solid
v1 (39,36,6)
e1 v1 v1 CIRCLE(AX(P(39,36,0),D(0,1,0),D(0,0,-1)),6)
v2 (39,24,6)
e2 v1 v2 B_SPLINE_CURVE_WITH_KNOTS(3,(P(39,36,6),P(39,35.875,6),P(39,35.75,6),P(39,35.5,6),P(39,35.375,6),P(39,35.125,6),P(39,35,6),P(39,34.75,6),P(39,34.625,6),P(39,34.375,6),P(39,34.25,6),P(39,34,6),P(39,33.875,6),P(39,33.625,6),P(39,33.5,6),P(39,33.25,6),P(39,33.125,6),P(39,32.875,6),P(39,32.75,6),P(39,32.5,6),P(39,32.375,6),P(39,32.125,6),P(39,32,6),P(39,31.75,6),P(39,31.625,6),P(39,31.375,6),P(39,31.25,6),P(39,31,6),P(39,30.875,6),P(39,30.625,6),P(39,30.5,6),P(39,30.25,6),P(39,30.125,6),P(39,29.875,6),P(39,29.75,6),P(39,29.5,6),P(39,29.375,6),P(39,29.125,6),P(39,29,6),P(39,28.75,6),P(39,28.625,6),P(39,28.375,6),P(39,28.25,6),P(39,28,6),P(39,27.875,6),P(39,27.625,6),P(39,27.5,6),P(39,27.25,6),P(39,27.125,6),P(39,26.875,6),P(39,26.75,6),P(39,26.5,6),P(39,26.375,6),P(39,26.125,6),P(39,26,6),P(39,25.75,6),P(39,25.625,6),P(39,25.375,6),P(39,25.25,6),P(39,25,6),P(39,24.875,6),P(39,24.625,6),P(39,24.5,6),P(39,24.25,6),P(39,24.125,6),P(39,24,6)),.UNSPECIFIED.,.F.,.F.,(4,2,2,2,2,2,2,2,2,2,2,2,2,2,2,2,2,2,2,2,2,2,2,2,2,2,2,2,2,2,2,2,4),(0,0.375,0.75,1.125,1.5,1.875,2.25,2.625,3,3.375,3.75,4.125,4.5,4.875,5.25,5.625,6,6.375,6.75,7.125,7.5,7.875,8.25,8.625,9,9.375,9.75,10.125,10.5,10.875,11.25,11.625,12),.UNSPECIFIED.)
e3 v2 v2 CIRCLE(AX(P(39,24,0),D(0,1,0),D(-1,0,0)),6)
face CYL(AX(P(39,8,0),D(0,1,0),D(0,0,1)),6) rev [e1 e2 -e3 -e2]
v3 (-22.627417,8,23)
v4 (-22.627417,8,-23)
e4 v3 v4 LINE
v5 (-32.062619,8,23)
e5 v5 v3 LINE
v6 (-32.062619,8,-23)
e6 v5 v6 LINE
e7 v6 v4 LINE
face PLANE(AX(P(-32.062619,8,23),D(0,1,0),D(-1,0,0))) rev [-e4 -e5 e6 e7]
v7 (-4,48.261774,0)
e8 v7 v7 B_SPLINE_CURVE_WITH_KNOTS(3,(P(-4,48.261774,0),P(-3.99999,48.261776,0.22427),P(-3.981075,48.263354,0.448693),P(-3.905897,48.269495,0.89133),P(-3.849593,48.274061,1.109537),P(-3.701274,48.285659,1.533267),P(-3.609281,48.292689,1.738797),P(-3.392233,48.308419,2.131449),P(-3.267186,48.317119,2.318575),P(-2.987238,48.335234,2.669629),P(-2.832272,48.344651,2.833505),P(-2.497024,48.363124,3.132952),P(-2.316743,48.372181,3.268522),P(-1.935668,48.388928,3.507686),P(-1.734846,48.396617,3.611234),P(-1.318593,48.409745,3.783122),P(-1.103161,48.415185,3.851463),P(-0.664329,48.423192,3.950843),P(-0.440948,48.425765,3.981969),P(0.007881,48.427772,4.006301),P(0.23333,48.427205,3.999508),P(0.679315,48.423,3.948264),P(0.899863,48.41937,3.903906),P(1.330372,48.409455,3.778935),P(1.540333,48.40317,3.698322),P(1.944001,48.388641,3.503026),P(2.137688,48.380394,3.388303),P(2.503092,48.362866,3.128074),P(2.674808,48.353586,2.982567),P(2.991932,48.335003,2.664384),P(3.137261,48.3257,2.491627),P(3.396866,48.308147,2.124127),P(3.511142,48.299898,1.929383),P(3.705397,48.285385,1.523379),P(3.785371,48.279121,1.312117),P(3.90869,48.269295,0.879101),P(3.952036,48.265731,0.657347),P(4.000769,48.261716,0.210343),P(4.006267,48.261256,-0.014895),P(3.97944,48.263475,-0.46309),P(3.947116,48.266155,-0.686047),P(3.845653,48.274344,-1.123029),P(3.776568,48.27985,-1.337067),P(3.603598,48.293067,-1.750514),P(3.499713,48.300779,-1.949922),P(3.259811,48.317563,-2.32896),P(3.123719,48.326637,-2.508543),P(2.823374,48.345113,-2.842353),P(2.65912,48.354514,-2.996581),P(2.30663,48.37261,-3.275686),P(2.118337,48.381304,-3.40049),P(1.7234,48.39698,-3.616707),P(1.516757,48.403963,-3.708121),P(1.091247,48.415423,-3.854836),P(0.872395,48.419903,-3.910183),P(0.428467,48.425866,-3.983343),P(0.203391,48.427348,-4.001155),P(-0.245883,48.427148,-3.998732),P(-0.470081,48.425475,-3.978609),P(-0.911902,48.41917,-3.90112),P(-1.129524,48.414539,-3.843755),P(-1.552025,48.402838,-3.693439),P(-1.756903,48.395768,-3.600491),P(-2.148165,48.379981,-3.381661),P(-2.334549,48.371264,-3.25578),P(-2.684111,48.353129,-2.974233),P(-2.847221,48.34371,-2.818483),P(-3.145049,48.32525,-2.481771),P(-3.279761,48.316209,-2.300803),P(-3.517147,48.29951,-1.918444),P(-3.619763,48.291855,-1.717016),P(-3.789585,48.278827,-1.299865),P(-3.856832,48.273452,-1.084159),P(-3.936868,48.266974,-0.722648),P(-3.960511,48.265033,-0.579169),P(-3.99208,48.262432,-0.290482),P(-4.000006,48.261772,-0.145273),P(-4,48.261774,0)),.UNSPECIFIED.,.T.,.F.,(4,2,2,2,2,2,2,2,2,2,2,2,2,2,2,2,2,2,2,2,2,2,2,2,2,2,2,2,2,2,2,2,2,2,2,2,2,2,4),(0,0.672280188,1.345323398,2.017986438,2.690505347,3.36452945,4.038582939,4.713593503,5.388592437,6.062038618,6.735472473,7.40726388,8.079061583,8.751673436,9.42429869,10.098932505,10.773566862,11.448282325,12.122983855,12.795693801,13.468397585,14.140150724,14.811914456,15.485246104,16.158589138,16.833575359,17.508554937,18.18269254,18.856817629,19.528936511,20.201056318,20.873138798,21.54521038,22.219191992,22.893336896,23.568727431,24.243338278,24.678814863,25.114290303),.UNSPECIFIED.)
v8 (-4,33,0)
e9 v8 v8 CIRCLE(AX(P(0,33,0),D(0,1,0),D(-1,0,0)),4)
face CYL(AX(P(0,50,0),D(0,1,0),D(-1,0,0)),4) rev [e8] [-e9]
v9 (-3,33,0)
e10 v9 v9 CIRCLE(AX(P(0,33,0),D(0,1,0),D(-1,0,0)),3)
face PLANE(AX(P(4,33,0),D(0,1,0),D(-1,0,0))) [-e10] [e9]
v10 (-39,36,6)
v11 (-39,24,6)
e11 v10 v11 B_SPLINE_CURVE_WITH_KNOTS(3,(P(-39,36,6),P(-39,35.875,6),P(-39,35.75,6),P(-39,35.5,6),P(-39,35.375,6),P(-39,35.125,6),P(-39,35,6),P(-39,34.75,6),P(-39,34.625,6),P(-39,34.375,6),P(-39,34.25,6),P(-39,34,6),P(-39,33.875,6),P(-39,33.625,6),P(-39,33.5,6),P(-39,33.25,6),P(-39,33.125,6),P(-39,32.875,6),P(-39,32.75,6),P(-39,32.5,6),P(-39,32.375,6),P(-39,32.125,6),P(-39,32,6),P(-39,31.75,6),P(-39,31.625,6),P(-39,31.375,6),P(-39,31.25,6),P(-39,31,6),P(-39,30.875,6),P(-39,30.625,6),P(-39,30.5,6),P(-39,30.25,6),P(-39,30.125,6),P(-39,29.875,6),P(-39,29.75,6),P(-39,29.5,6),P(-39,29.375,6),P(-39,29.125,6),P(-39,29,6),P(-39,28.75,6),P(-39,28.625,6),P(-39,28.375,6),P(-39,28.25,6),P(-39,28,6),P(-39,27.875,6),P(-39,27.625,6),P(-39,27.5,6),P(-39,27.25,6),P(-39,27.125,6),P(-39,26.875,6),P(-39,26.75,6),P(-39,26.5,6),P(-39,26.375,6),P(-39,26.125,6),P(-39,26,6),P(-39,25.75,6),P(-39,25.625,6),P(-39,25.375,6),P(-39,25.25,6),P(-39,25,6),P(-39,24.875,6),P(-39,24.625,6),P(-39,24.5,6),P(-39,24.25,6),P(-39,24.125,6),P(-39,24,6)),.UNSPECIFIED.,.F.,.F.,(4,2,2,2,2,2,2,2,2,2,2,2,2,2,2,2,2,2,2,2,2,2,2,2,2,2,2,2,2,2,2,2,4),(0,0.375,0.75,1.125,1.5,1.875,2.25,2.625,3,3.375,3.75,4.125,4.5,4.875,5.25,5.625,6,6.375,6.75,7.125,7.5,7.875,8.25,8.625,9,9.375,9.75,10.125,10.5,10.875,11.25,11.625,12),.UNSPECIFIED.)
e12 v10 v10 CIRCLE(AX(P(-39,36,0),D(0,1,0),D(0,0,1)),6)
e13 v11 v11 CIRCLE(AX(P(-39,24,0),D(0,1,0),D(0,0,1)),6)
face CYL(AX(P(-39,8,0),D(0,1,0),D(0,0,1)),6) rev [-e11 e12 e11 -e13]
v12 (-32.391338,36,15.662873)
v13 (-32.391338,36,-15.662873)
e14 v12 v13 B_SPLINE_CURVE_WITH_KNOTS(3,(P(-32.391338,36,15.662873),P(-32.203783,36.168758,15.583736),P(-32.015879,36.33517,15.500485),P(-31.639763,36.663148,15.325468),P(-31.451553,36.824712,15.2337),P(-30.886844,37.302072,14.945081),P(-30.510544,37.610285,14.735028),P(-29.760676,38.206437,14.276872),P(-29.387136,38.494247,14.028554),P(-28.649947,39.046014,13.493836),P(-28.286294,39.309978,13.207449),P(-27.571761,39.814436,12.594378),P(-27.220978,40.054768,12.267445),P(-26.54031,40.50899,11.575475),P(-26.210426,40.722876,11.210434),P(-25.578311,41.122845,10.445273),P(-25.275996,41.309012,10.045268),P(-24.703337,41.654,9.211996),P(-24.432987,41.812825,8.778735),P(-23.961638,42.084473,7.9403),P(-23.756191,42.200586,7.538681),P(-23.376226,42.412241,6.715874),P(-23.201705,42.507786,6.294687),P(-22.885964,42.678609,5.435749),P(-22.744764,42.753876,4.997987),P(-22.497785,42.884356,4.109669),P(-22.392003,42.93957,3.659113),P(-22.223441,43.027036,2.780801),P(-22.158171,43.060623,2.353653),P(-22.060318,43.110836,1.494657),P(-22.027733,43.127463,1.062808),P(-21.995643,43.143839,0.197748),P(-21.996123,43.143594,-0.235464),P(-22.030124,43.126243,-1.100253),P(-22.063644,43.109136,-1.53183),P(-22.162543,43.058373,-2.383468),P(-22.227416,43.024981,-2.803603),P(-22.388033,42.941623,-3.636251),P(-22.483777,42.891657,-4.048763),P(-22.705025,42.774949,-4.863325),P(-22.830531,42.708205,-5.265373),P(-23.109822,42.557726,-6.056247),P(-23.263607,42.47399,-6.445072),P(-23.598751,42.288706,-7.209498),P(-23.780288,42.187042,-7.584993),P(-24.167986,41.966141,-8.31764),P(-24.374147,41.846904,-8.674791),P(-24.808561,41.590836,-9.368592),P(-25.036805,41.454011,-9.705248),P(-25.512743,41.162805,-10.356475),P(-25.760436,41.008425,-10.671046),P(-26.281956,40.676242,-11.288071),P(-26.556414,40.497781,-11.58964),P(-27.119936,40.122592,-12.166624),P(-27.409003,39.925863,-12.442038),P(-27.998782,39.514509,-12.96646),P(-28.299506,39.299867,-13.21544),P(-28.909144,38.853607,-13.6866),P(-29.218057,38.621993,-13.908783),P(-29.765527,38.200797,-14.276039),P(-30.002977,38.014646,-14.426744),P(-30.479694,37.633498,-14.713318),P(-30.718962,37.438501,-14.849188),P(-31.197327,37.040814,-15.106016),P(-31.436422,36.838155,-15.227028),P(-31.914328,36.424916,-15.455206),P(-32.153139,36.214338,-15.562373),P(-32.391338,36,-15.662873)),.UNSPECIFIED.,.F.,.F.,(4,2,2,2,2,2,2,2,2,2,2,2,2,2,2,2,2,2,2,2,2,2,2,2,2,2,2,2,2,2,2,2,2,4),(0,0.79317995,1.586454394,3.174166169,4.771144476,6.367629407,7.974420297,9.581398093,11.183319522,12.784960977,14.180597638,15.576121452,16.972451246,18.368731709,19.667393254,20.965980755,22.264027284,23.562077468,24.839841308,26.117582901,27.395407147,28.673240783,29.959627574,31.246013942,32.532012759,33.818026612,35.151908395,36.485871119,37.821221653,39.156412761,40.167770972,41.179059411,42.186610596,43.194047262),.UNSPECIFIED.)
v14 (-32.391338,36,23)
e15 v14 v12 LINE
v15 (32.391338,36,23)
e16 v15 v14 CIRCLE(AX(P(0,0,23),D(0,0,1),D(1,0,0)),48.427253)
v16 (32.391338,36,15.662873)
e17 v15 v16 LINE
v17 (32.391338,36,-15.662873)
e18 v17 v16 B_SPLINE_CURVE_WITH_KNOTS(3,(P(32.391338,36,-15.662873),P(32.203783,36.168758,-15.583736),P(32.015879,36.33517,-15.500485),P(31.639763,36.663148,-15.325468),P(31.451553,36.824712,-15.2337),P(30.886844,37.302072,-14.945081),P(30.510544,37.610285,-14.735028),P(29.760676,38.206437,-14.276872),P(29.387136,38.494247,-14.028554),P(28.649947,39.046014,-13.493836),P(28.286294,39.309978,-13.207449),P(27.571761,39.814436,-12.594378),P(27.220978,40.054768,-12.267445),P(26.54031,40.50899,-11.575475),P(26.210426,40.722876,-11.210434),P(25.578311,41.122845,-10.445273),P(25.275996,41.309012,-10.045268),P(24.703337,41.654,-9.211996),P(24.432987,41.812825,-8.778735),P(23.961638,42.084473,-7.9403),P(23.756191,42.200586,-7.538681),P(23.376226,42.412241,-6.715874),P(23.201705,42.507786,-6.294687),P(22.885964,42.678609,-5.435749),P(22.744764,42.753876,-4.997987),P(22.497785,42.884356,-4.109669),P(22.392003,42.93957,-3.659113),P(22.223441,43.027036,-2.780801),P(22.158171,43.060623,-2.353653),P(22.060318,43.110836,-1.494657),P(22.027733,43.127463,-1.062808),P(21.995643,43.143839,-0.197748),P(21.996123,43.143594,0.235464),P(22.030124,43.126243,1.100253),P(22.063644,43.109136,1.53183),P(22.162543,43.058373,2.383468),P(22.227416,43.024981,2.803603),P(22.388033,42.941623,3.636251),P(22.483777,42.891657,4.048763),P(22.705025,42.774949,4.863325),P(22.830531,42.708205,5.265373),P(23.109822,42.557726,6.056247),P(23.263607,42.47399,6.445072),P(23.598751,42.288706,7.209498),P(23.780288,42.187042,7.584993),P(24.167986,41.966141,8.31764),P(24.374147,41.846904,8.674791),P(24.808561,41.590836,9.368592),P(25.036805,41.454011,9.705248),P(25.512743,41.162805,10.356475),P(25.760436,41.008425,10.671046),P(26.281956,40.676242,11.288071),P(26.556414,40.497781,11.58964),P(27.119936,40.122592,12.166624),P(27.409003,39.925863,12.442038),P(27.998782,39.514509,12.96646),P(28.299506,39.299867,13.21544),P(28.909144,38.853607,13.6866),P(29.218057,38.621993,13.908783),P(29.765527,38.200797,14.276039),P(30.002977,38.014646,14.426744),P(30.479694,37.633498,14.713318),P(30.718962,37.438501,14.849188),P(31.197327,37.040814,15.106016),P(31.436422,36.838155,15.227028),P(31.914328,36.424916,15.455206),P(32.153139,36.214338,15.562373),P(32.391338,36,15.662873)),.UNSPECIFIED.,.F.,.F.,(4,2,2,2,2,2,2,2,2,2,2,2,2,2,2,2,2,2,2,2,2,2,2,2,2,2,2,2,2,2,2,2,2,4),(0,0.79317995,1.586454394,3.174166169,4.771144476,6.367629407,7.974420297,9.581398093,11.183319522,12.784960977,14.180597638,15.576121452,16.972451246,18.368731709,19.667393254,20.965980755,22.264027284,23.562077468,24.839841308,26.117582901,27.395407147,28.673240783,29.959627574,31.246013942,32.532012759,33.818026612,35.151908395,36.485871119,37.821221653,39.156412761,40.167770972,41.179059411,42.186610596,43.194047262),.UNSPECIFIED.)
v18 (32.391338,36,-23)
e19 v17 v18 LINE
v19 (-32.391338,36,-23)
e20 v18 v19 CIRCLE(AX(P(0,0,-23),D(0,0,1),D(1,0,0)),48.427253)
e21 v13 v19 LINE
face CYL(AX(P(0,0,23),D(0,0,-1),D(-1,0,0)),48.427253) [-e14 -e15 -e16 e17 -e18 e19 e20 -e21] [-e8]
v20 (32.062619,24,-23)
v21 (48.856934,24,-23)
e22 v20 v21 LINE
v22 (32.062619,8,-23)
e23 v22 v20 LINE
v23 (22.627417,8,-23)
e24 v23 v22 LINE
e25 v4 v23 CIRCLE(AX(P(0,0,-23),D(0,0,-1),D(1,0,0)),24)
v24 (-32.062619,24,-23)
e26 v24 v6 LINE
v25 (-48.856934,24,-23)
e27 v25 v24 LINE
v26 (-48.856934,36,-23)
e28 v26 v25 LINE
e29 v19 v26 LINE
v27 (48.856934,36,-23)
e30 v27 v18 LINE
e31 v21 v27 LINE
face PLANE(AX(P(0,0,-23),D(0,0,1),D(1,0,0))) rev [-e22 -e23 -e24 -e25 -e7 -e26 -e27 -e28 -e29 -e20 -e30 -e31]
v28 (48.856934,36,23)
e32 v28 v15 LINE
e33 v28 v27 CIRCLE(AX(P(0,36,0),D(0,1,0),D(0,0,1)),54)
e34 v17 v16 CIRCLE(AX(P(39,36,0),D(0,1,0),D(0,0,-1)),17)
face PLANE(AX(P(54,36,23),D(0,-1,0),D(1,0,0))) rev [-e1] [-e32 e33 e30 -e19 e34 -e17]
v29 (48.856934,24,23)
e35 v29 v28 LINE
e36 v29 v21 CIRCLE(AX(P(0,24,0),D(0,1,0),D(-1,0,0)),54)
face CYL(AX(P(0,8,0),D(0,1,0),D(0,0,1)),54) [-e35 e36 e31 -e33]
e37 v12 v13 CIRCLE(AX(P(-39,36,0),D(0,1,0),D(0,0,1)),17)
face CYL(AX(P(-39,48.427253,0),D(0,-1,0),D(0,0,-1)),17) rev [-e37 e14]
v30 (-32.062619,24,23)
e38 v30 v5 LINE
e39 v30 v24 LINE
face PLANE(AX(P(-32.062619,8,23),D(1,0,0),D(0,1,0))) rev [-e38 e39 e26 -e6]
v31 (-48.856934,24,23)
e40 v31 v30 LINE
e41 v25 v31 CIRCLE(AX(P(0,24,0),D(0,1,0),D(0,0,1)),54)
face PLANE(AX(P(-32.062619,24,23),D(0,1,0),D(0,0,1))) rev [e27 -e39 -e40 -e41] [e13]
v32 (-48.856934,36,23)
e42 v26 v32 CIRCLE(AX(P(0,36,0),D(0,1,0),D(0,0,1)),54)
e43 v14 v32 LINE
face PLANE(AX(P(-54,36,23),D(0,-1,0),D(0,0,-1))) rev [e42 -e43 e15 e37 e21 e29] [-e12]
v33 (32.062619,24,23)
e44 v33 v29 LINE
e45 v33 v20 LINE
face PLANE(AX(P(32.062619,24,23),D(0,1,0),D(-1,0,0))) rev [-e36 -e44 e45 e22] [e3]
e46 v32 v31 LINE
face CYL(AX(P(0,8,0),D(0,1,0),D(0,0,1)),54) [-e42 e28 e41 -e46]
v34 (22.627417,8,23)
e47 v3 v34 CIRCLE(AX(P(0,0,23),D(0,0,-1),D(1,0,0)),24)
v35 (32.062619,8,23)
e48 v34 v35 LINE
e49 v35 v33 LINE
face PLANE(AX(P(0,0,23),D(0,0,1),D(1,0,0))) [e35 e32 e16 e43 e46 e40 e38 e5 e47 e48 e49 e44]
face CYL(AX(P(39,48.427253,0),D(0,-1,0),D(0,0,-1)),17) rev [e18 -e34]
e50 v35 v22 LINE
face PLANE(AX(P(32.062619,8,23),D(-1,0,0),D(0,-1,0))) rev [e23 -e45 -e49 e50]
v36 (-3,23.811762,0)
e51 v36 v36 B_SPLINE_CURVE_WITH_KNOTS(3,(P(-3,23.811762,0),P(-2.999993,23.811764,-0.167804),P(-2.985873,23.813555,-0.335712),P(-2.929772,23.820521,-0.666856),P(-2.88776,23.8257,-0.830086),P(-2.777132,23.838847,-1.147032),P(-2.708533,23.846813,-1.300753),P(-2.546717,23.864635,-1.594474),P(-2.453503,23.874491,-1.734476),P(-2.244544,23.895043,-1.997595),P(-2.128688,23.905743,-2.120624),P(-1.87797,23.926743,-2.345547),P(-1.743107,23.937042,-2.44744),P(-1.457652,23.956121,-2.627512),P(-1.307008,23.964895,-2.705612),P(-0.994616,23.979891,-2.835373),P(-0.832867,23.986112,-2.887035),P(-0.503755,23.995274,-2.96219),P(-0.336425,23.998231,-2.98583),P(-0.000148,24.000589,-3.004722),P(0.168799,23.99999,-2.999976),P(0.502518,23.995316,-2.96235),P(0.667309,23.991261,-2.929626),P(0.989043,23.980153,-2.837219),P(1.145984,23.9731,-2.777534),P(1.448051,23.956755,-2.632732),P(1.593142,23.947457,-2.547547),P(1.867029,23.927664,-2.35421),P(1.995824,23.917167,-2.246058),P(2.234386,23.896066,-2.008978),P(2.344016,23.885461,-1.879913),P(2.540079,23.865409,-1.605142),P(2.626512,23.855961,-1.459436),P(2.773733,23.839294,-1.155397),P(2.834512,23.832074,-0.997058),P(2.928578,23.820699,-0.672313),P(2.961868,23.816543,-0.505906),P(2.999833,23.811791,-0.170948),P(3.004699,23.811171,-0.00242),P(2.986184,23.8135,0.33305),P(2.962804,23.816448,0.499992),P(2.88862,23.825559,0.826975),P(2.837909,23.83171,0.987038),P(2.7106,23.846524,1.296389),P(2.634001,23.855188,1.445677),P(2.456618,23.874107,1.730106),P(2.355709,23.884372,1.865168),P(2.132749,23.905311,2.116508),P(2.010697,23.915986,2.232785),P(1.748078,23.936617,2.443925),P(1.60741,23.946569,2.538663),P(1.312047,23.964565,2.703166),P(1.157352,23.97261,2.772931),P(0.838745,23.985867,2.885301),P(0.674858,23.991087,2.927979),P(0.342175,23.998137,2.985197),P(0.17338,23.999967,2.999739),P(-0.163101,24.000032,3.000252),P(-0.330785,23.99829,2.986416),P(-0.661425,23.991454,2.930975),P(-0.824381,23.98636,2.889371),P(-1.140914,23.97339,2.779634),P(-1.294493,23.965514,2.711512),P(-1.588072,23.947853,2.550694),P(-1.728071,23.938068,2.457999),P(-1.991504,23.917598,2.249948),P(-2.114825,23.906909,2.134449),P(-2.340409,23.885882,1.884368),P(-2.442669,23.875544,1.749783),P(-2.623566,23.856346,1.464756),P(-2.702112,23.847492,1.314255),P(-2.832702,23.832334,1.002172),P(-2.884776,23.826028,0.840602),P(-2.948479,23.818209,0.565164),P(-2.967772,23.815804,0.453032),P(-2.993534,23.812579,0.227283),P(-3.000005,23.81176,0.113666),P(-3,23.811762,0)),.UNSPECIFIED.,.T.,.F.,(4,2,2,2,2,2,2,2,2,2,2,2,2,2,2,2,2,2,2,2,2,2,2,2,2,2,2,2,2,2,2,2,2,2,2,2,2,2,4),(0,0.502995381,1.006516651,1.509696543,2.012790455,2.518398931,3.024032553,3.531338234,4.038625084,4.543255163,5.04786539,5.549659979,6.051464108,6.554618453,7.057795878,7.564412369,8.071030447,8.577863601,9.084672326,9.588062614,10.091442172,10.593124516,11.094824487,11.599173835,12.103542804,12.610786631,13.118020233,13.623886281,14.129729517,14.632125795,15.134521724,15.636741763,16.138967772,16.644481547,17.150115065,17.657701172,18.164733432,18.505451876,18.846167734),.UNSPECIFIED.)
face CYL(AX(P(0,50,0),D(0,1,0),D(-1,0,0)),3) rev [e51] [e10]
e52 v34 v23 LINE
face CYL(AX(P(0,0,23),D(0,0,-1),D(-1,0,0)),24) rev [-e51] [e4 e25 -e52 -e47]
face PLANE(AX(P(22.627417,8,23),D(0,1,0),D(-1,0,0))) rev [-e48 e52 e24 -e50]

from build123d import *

# Parameters (mm, degrees)
BOSS_EXTRUDE1_DEPTH = 23
SKETCH2_R           = 17
CUT_EXTRUDE1_DEPTH  = 66.030761952
SKETCH3_R           = 6
CUT_EXTRUDE2_DEPTH  = 66.030761987
CUT_EXTRUDE3_START  = -12
CUT_EXTRUDE3_DEPTH  = 12


# Read off the part's stored shape, not the designer's step: Cut-Extrude3
with BuildPart() as part:
    # Sketch1 → Boss-Extrude1 (new, symmetric)
    with BuildSketch(Plane.XY):
        with BuildLine():
            Line((-32.062618722, 8), (-22.627416998, 8))
            ThreePointArc((-22.627416998, 8), (0, 24), (22.627416998, 8))
            Line((22.627416998, 8), (32.062618722, 8))
            Line((32.062618722, 8), (32.062618722, 24))
            Line((32.062618722, 24), (54, 24))
            Line((54, 24), (54, 36))
            Line((54, 36), (32.391338275, 36))
            ThreePointArc((32.391338275, 36), (0, 48.427252609), (-32.391338275, 36))
            Line((-32.391338275, 36), (-54, 36))
            Line((-54, 36), (-54, 24))
            Line((-54, 24), (-32.062618722, 24))
            Line((-32.062618722, 24), (-32.062618722, 8))
        make_face()
    extrude(amount=BOSS_EXTRUDE1_DEPTH, both=True)

    # Sketch2 → Cut-Extrude1 (cut, through all)
    with BuildSketch(Plane(origin=(0, 36, 0), x_dir=(1, 0, 0), z_dir=(0, 1, 0))):
        with Locations((-39, 0)):
            Circle(SKETCH2_R)
        with Locations((39, 0)):
            Circle(SKETCH2_R)
    extrude(amount=CUT_EXTRUDE1_DEPTH, mode=Mode.SUBTRACT)

    # Sketch3 → Cut-Extrude2 (cut, through all)
    with BuildSketch(Plane(origin=(0, 36, 0), x_dir=(1, 0, 0), z_dir=(0, 1, 0))):
        with Locations(Location((-39, 0, 0), (0, 0, 270))):
            Circle(SKETCH3_R)
        with Locations(Location((39, 0, 0), (0, 0, 270))):
            Circle(SKETCH3_R)
    extrude(amount=-CUT_EXTRUDE2_DEPTH, mode=Mode.SUBTRACT)

    # Sketch4 → Cut-Revolve1 (revolve, cut)
    with BuildSketch(Plane.XY, mode=Mode.PRIVATE) as cut_revolve1_sk:
        Polygon((0, 50), (4, 50), (4, 33), (3, 33), (3, 20), (0, 20), align=None)
    revolve(cut_revolve1_sk.sketch.rotate(Axis((0, 50, 0), (0, -1, 0)), 180), axis=Axis((0, 50, 0), (0, -1, 0)), mode=Mode.SUBTRACT)

    # Cut-Extrude3 outline → Cut-Extrude3 (cut)
    with BuildSketch(Plane(origin=(0, 36, 0), x_dir=(1, 0, 0), z_dir=(0, 1, 0)).offset(CUT_EXTRUDE3_START)):
        with BuildLine():
            ThreePointArc((-54, 0), (-52.698550436, 11.784005345), (-48.856934001, 23))
            Line((-48.856934001, 23), (-54, 23))
            Line((-54, 23), (-54, 0))
        make_face()
        with BuildLine():
            ThreePointArc((-48.856934001, -23), (-52.698550436, -11.784005345), (-54, 0))
            Line((-54, 0), (-54, -23))
            Line((-54, -23), (-48.856934001, -23))
        make_face()
        with BuildLine():
            Line((54, 23), (48.856934001, 23))
            ThreePointArc((48.856934001, 23), (52.698550436, 11.784005345), (54, 0))
            Line((54, 0), (54, 23))
        make_face()
        with BuildLine():
            Line((54, -23), (54, 0))
            ThreePointArc((54, 0), (52.698550436, -11.784005345), (48.856934001, -23))
            Line((48.856934001, -23), (54, -23))
        make_face()
    extrude(amount=CUT_EXTRUDE3_DEPTH, mode=Mode.SUBTRACT)


solid = part.part
